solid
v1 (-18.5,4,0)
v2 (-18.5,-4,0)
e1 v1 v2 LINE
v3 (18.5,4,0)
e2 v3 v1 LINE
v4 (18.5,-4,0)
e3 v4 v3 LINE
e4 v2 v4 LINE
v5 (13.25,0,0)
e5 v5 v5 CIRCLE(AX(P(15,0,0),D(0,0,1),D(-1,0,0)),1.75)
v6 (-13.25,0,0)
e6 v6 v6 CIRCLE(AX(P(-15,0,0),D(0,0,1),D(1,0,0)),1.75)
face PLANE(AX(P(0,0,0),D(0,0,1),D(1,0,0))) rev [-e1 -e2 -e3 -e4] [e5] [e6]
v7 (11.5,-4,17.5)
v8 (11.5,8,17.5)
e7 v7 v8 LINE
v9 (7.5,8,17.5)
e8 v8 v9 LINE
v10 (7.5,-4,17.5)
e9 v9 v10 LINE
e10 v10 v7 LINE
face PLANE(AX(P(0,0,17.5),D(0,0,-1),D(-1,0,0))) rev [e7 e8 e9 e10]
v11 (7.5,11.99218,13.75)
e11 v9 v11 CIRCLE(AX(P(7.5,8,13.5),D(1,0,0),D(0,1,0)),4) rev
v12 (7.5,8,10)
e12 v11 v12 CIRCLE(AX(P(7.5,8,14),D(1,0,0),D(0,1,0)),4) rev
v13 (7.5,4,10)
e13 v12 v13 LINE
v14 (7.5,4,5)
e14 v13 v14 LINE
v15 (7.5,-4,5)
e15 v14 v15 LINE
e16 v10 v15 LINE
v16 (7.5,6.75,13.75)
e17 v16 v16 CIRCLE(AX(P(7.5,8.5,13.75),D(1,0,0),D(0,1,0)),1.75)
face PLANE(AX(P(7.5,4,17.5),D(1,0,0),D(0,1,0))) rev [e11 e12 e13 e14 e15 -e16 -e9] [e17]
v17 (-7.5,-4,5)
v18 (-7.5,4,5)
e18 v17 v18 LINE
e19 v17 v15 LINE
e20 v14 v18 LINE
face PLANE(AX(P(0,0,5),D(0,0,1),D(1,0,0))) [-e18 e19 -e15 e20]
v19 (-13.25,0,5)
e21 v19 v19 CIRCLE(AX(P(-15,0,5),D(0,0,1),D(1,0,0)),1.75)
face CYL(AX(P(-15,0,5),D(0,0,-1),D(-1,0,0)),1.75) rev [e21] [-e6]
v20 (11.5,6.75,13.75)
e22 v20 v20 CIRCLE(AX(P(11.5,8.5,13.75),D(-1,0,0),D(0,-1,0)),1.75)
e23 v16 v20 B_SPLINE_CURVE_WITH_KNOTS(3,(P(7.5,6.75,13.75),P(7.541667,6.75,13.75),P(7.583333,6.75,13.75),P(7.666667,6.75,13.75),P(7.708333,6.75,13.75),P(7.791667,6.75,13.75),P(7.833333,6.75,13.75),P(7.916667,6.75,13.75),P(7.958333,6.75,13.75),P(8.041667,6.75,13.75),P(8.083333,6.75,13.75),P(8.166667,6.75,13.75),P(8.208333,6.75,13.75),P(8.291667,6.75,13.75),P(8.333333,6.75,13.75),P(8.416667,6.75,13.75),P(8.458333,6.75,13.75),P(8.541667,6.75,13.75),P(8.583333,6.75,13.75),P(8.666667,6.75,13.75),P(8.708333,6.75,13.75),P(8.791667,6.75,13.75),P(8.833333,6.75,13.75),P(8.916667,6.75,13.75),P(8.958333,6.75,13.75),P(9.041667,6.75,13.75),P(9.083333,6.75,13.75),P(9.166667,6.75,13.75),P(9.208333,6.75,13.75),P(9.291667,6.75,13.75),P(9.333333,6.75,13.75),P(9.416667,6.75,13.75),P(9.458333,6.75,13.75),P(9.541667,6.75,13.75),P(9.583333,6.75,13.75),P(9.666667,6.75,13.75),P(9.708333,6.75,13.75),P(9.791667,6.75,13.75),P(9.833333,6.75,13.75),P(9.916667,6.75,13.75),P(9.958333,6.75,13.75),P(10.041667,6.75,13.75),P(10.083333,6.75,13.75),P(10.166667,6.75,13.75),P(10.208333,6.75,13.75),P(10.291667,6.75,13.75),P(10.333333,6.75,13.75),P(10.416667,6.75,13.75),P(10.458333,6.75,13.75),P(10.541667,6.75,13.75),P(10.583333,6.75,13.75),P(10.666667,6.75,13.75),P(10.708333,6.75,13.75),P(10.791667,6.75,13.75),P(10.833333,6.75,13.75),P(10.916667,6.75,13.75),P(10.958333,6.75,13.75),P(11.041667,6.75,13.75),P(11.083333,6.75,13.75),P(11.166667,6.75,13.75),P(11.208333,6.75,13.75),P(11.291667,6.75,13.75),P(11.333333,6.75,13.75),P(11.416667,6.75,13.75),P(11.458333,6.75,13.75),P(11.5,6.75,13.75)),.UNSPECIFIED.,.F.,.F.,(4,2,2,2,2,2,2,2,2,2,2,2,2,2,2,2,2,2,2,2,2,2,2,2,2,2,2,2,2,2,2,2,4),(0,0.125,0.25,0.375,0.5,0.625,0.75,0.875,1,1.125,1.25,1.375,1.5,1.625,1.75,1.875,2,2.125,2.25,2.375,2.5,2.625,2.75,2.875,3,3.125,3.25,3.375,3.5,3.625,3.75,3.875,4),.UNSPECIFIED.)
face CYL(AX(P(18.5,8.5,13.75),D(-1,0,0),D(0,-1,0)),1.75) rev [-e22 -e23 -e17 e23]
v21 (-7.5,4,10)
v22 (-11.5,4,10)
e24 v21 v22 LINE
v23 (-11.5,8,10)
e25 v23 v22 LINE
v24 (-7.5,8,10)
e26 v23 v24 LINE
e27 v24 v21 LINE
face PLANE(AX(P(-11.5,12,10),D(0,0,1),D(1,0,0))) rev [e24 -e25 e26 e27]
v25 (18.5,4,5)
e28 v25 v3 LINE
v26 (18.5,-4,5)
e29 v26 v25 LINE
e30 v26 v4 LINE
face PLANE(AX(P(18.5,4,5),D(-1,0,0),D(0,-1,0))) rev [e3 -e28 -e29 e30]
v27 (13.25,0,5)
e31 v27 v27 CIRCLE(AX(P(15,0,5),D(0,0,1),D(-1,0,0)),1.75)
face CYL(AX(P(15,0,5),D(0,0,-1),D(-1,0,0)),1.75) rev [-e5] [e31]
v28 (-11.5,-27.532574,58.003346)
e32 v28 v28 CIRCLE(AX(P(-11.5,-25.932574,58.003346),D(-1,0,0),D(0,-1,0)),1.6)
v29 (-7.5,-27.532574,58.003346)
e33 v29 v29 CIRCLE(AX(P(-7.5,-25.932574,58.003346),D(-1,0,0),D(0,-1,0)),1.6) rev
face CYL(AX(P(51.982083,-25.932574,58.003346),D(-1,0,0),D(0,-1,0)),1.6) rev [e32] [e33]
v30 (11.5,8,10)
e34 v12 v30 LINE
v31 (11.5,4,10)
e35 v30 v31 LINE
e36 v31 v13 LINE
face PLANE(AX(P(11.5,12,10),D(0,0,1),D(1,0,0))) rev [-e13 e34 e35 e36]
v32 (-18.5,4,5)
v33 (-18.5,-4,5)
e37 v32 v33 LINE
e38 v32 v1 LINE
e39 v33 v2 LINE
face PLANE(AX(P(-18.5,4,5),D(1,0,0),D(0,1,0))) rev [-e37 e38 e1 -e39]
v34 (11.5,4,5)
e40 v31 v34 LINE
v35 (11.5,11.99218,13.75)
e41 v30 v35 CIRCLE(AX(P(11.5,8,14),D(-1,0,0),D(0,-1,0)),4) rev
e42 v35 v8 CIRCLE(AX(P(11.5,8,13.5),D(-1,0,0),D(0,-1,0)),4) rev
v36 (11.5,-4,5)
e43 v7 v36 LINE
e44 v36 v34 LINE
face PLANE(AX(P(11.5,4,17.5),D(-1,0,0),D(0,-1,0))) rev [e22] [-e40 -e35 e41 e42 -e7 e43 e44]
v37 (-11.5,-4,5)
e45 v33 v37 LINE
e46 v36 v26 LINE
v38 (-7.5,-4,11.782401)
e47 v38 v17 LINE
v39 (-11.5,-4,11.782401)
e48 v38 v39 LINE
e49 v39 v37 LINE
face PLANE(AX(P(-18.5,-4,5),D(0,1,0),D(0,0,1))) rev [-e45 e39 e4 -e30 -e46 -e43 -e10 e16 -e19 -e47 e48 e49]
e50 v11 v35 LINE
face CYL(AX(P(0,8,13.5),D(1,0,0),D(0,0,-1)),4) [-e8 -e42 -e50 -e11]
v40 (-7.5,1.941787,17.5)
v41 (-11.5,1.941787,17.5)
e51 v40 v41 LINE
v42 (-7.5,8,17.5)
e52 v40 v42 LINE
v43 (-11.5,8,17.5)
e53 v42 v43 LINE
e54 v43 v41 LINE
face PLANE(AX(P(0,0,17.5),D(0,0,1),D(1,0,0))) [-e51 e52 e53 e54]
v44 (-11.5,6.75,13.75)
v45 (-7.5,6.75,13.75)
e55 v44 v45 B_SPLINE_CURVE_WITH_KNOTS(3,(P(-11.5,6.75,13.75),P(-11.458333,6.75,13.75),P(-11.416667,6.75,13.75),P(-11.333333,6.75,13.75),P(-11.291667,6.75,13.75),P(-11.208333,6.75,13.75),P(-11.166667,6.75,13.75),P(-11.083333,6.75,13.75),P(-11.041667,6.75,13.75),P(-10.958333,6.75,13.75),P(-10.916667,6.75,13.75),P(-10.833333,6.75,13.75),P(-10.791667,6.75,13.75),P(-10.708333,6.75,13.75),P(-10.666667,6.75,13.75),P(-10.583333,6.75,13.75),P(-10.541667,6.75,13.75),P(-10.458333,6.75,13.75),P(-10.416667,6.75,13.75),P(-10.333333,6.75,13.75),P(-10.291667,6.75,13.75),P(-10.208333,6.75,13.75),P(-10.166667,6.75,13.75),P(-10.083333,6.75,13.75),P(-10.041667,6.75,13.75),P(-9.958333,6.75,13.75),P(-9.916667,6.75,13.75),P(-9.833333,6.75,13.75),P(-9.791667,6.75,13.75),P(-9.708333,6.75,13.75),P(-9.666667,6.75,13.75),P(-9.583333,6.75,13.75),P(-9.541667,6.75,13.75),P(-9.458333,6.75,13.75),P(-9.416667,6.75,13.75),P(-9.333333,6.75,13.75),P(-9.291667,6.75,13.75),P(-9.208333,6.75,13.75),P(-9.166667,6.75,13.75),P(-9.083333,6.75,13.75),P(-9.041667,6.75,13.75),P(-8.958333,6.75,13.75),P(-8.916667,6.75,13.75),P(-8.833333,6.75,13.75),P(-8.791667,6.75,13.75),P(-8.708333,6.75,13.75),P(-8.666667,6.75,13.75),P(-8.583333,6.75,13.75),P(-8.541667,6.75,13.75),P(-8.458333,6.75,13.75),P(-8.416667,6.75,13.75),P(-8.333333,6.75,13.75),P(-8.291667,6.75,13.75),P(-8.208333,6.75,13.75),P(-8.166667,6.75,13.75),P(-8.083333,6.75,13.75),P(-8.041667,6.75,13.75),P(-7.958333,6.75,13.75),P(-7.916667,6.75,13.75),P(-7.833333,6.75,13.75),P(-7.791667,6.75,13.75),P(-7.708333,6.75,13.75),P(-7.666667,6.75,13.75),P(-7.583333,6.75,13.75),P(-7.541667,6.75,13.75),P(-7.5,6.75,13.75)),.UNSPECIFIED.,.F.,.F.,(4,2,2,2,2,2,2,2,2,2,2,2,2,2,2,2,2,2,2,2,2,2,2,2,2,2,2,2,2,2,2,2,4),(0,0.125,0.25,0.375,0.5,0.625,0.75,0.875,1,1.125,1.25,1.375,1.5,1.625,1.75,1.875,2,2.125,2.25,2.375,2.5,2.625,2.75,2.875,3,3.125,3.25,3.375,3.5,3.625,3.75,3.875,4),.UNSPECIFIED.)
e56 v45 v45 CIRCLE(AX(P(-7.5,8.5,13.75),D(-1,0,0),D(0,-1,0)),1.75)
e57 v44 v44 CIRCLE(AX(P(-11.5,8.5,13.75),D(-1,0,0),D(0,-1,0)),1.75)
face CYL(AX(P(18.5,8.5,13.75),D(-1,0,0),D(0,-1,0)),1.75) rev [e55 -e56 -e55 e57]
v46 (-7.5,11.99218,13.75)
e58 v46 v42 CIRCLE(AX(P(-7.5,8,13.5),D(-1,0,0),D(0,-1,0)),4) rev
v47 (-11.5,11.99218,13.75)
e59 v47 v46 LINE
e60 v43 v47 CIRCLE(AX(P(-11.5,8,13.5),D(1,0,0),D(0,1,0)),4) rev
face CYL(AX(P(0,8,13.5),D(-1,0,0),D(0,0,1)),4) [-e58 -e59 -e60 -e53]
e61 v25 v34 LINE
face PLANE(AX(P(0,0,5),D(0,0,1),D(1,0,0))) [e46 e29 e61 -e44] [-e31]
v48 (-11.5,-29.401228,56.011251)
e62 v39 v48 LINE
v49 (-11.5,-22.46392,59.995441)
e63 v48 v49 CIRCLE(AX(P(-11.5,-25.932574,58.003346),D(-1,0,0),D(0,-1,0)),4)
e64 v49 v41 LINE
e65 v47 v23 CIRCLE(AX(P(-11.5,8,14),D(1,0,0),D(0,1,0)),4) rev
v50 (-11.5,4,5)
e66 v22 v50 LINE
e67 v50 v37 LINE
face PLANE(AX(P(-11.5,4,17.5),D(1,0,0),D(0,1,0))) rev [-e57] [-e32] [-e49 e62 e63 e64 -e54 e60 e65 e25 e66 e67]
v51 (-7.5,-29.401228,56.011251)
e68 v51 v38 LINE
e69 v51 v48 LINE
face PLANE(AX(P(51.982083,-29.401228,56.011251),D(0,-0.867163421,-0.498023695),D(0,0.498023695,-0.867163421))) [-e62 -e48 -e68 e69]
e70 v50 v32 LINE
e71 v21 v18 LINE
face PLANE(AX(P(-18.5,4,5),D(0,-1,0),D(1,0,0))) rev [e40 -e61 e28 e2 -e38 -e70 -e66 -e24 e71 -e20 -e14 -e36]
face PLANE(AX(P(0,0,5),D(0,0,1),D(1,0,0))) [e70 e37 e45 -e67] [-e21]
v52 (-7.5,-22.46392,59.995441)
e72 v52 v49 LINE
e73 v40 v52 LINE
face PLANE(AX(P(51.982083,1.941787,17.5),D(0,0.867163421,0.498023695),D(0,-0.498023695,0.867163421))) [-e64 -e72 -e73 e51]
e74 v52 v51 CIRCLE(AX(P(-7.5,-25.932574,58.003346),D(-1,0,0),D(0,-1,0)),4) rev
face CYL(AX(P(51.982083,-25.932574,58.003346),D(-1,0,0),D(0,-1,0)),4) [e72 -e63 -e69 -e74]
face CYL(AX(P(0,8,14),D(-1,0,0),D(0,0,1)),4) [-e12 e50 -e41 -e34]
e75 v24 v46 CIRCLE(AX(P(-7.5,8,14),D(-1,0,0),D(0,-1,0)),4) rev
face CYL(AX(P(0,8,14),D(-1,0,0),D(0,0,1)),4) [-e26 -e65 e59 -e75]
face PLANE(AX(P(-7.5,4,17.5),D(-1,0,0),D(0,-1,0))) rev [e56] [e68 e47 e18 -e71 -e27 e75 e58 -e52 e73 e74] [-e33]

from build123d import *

# Parameters (mm, degrees)
SKETCH1_W           = 37
SKETCH1_H           = 8
SKETCH1_R           = 1.75
BOSS_EXTRUDE1_DEPTH = 5
SKETCH2_W           = 4
SKETCH2_H           = 8
BOSS_EXTRUDE2_DEPTH = 12.5
SKETCH4_W           = 4
SKETCH4_H           = 7.5
BOSS_EXTRUDE3_DEPTH = 8
SKETCH3_R           = 1.75
CUT_EXTRUDE1_DEPTH  = 37.745748053
FILLET1_R           = 4
SKETCH6_R           = 1.6
BOSS_EXTRUDE5_DEPTH = 4


with BuildPart() as part:
    # Sketch1 → Boss-Extrude1 (new body)
    with BuildSketch(Plane.XY):
        Rectangle(SKETCH1_W, SKETCH1_H)
        with Locations((-15, 0)):
            Circle(SKETCH1_R, mode=Mode.SUBTRACT)
        with Locations(Location((15, 0, 0), (0, 0, 180))):
            Circle(SKETCH1_R, mode=Mode.SUBTRACT)
    extrude(amount=BOSS_EXTRUDE1_DEPTH)

    # Sketch2 → Boss-Extrude2 (add)
    with BuildSketch(Plane.XY.offset(5)):
        with Locations((-9.5, 0)):
            Rectangle(SKETCH2_W, SKETCH2_H)
        with Locations((9.5, 0)):
            Rectangle(SKETCH2_W, SKETCH2_H)
    extrude(amount=BOSS_EXTRUDE2_DEPTH)

    # Sketch4 → Boss-Extrude3 (add)
    with BuildSketch(Plane(origin=(0, 4, 0), x_dir=(1, 0, 0), z_dir=(0, 1, 0))):
        with Locations((-9.5, -13.75)):
            Rectangle(SKETCH4_W, SKETCH4_H)
        with Locations((9.5, -13.75)):
            Rectangle(SKETCH4_W, SKETCH4_H)
    extrude(amount=BOSS_EXTRUDE3_DEPTH)

    # Sketch3 → Cut-Extrude1 (cut, through all)
    with BuildSketch(Plane.ZY.offset(11.5)):
        with Locations(Location((13.75, 8.5, 0), (0, 0, 270))):
            Circle(SKETCH3_R)
    extrude(amount=-CUT_EXTRUDE1_DEPTH, mode=Mode.SUBTRACT)

    # Fillet1
    # the kernel refuses this fillet: 4 mm, written as the material it takes off along each edge
    with BuildSketch(Plane(origin=(2.5, 12, 10), x_dir=(0, -1, 0), z_dir=(-1, 0, 0))) as fillet1_piece_1:
        with BuildLine():
            CenterArc((FILLET1_R, FILLET1_R), FILLET1_R, 180, 90)
            Line((0, FILLET1_R), (0, 0))
            Line((0, 0), (FILLET1_R, 0))
        make_face()
    extrude(amount=24, mode=Mode.SUBTRACT)
    with BuildSketch(Plane(origin=(-2.5, 12, 10), x_dir=(0, -1, 0), z_dir=(1, 0, 0)), Plane(origin=(21.5, 12, 17.5), x_dir=(0, -1, 0), z_dir=(-1, 0, 0)), Plane(origin=(-21.5, 12, 17.5), x_dir=(0, 0, -1), z_dir=(1, 0, 0))) as fillet1_piece_2:
        with BuildLine():
            CenterArc((FILLET1_R, -FILLET1_R), FILLET1_R, 90, 90)
            Line((0, -FILLET1_R), (0, 0))
            Line((0, 0), (FILLET1_R, 0))
        make_face()
    extrude(amount=24, mode=Mode.SUBTRACT)

    # Sketch6 → Boss-Extrude5 (add)
    with BuildSketch(Plane.ZY.offset(11.5)):
        with BuildLine():
            Line((56.011251263, -29.401227517), (11.782401197, -4))
            Line((11.782401197, -4), (17.5, 1.941786969))
            Line((17.5, 1.941786969), (59.995440826, -22.463920148))
            ThreePointArc((59.995440826, -22.463920148), (61.471999729, -27.924668614), (56.011251263, -29.401227517))
        make_face()
        with Locations(Location((58.003346044, -25.932573832, 0), (0, 0, 270))):
            Circle(SKETCH6_R, mode=Mode.SUBTRACT)
    extrude(amount=-BOSS_EXTRUDE5_DEPTH)


solid = part.part
